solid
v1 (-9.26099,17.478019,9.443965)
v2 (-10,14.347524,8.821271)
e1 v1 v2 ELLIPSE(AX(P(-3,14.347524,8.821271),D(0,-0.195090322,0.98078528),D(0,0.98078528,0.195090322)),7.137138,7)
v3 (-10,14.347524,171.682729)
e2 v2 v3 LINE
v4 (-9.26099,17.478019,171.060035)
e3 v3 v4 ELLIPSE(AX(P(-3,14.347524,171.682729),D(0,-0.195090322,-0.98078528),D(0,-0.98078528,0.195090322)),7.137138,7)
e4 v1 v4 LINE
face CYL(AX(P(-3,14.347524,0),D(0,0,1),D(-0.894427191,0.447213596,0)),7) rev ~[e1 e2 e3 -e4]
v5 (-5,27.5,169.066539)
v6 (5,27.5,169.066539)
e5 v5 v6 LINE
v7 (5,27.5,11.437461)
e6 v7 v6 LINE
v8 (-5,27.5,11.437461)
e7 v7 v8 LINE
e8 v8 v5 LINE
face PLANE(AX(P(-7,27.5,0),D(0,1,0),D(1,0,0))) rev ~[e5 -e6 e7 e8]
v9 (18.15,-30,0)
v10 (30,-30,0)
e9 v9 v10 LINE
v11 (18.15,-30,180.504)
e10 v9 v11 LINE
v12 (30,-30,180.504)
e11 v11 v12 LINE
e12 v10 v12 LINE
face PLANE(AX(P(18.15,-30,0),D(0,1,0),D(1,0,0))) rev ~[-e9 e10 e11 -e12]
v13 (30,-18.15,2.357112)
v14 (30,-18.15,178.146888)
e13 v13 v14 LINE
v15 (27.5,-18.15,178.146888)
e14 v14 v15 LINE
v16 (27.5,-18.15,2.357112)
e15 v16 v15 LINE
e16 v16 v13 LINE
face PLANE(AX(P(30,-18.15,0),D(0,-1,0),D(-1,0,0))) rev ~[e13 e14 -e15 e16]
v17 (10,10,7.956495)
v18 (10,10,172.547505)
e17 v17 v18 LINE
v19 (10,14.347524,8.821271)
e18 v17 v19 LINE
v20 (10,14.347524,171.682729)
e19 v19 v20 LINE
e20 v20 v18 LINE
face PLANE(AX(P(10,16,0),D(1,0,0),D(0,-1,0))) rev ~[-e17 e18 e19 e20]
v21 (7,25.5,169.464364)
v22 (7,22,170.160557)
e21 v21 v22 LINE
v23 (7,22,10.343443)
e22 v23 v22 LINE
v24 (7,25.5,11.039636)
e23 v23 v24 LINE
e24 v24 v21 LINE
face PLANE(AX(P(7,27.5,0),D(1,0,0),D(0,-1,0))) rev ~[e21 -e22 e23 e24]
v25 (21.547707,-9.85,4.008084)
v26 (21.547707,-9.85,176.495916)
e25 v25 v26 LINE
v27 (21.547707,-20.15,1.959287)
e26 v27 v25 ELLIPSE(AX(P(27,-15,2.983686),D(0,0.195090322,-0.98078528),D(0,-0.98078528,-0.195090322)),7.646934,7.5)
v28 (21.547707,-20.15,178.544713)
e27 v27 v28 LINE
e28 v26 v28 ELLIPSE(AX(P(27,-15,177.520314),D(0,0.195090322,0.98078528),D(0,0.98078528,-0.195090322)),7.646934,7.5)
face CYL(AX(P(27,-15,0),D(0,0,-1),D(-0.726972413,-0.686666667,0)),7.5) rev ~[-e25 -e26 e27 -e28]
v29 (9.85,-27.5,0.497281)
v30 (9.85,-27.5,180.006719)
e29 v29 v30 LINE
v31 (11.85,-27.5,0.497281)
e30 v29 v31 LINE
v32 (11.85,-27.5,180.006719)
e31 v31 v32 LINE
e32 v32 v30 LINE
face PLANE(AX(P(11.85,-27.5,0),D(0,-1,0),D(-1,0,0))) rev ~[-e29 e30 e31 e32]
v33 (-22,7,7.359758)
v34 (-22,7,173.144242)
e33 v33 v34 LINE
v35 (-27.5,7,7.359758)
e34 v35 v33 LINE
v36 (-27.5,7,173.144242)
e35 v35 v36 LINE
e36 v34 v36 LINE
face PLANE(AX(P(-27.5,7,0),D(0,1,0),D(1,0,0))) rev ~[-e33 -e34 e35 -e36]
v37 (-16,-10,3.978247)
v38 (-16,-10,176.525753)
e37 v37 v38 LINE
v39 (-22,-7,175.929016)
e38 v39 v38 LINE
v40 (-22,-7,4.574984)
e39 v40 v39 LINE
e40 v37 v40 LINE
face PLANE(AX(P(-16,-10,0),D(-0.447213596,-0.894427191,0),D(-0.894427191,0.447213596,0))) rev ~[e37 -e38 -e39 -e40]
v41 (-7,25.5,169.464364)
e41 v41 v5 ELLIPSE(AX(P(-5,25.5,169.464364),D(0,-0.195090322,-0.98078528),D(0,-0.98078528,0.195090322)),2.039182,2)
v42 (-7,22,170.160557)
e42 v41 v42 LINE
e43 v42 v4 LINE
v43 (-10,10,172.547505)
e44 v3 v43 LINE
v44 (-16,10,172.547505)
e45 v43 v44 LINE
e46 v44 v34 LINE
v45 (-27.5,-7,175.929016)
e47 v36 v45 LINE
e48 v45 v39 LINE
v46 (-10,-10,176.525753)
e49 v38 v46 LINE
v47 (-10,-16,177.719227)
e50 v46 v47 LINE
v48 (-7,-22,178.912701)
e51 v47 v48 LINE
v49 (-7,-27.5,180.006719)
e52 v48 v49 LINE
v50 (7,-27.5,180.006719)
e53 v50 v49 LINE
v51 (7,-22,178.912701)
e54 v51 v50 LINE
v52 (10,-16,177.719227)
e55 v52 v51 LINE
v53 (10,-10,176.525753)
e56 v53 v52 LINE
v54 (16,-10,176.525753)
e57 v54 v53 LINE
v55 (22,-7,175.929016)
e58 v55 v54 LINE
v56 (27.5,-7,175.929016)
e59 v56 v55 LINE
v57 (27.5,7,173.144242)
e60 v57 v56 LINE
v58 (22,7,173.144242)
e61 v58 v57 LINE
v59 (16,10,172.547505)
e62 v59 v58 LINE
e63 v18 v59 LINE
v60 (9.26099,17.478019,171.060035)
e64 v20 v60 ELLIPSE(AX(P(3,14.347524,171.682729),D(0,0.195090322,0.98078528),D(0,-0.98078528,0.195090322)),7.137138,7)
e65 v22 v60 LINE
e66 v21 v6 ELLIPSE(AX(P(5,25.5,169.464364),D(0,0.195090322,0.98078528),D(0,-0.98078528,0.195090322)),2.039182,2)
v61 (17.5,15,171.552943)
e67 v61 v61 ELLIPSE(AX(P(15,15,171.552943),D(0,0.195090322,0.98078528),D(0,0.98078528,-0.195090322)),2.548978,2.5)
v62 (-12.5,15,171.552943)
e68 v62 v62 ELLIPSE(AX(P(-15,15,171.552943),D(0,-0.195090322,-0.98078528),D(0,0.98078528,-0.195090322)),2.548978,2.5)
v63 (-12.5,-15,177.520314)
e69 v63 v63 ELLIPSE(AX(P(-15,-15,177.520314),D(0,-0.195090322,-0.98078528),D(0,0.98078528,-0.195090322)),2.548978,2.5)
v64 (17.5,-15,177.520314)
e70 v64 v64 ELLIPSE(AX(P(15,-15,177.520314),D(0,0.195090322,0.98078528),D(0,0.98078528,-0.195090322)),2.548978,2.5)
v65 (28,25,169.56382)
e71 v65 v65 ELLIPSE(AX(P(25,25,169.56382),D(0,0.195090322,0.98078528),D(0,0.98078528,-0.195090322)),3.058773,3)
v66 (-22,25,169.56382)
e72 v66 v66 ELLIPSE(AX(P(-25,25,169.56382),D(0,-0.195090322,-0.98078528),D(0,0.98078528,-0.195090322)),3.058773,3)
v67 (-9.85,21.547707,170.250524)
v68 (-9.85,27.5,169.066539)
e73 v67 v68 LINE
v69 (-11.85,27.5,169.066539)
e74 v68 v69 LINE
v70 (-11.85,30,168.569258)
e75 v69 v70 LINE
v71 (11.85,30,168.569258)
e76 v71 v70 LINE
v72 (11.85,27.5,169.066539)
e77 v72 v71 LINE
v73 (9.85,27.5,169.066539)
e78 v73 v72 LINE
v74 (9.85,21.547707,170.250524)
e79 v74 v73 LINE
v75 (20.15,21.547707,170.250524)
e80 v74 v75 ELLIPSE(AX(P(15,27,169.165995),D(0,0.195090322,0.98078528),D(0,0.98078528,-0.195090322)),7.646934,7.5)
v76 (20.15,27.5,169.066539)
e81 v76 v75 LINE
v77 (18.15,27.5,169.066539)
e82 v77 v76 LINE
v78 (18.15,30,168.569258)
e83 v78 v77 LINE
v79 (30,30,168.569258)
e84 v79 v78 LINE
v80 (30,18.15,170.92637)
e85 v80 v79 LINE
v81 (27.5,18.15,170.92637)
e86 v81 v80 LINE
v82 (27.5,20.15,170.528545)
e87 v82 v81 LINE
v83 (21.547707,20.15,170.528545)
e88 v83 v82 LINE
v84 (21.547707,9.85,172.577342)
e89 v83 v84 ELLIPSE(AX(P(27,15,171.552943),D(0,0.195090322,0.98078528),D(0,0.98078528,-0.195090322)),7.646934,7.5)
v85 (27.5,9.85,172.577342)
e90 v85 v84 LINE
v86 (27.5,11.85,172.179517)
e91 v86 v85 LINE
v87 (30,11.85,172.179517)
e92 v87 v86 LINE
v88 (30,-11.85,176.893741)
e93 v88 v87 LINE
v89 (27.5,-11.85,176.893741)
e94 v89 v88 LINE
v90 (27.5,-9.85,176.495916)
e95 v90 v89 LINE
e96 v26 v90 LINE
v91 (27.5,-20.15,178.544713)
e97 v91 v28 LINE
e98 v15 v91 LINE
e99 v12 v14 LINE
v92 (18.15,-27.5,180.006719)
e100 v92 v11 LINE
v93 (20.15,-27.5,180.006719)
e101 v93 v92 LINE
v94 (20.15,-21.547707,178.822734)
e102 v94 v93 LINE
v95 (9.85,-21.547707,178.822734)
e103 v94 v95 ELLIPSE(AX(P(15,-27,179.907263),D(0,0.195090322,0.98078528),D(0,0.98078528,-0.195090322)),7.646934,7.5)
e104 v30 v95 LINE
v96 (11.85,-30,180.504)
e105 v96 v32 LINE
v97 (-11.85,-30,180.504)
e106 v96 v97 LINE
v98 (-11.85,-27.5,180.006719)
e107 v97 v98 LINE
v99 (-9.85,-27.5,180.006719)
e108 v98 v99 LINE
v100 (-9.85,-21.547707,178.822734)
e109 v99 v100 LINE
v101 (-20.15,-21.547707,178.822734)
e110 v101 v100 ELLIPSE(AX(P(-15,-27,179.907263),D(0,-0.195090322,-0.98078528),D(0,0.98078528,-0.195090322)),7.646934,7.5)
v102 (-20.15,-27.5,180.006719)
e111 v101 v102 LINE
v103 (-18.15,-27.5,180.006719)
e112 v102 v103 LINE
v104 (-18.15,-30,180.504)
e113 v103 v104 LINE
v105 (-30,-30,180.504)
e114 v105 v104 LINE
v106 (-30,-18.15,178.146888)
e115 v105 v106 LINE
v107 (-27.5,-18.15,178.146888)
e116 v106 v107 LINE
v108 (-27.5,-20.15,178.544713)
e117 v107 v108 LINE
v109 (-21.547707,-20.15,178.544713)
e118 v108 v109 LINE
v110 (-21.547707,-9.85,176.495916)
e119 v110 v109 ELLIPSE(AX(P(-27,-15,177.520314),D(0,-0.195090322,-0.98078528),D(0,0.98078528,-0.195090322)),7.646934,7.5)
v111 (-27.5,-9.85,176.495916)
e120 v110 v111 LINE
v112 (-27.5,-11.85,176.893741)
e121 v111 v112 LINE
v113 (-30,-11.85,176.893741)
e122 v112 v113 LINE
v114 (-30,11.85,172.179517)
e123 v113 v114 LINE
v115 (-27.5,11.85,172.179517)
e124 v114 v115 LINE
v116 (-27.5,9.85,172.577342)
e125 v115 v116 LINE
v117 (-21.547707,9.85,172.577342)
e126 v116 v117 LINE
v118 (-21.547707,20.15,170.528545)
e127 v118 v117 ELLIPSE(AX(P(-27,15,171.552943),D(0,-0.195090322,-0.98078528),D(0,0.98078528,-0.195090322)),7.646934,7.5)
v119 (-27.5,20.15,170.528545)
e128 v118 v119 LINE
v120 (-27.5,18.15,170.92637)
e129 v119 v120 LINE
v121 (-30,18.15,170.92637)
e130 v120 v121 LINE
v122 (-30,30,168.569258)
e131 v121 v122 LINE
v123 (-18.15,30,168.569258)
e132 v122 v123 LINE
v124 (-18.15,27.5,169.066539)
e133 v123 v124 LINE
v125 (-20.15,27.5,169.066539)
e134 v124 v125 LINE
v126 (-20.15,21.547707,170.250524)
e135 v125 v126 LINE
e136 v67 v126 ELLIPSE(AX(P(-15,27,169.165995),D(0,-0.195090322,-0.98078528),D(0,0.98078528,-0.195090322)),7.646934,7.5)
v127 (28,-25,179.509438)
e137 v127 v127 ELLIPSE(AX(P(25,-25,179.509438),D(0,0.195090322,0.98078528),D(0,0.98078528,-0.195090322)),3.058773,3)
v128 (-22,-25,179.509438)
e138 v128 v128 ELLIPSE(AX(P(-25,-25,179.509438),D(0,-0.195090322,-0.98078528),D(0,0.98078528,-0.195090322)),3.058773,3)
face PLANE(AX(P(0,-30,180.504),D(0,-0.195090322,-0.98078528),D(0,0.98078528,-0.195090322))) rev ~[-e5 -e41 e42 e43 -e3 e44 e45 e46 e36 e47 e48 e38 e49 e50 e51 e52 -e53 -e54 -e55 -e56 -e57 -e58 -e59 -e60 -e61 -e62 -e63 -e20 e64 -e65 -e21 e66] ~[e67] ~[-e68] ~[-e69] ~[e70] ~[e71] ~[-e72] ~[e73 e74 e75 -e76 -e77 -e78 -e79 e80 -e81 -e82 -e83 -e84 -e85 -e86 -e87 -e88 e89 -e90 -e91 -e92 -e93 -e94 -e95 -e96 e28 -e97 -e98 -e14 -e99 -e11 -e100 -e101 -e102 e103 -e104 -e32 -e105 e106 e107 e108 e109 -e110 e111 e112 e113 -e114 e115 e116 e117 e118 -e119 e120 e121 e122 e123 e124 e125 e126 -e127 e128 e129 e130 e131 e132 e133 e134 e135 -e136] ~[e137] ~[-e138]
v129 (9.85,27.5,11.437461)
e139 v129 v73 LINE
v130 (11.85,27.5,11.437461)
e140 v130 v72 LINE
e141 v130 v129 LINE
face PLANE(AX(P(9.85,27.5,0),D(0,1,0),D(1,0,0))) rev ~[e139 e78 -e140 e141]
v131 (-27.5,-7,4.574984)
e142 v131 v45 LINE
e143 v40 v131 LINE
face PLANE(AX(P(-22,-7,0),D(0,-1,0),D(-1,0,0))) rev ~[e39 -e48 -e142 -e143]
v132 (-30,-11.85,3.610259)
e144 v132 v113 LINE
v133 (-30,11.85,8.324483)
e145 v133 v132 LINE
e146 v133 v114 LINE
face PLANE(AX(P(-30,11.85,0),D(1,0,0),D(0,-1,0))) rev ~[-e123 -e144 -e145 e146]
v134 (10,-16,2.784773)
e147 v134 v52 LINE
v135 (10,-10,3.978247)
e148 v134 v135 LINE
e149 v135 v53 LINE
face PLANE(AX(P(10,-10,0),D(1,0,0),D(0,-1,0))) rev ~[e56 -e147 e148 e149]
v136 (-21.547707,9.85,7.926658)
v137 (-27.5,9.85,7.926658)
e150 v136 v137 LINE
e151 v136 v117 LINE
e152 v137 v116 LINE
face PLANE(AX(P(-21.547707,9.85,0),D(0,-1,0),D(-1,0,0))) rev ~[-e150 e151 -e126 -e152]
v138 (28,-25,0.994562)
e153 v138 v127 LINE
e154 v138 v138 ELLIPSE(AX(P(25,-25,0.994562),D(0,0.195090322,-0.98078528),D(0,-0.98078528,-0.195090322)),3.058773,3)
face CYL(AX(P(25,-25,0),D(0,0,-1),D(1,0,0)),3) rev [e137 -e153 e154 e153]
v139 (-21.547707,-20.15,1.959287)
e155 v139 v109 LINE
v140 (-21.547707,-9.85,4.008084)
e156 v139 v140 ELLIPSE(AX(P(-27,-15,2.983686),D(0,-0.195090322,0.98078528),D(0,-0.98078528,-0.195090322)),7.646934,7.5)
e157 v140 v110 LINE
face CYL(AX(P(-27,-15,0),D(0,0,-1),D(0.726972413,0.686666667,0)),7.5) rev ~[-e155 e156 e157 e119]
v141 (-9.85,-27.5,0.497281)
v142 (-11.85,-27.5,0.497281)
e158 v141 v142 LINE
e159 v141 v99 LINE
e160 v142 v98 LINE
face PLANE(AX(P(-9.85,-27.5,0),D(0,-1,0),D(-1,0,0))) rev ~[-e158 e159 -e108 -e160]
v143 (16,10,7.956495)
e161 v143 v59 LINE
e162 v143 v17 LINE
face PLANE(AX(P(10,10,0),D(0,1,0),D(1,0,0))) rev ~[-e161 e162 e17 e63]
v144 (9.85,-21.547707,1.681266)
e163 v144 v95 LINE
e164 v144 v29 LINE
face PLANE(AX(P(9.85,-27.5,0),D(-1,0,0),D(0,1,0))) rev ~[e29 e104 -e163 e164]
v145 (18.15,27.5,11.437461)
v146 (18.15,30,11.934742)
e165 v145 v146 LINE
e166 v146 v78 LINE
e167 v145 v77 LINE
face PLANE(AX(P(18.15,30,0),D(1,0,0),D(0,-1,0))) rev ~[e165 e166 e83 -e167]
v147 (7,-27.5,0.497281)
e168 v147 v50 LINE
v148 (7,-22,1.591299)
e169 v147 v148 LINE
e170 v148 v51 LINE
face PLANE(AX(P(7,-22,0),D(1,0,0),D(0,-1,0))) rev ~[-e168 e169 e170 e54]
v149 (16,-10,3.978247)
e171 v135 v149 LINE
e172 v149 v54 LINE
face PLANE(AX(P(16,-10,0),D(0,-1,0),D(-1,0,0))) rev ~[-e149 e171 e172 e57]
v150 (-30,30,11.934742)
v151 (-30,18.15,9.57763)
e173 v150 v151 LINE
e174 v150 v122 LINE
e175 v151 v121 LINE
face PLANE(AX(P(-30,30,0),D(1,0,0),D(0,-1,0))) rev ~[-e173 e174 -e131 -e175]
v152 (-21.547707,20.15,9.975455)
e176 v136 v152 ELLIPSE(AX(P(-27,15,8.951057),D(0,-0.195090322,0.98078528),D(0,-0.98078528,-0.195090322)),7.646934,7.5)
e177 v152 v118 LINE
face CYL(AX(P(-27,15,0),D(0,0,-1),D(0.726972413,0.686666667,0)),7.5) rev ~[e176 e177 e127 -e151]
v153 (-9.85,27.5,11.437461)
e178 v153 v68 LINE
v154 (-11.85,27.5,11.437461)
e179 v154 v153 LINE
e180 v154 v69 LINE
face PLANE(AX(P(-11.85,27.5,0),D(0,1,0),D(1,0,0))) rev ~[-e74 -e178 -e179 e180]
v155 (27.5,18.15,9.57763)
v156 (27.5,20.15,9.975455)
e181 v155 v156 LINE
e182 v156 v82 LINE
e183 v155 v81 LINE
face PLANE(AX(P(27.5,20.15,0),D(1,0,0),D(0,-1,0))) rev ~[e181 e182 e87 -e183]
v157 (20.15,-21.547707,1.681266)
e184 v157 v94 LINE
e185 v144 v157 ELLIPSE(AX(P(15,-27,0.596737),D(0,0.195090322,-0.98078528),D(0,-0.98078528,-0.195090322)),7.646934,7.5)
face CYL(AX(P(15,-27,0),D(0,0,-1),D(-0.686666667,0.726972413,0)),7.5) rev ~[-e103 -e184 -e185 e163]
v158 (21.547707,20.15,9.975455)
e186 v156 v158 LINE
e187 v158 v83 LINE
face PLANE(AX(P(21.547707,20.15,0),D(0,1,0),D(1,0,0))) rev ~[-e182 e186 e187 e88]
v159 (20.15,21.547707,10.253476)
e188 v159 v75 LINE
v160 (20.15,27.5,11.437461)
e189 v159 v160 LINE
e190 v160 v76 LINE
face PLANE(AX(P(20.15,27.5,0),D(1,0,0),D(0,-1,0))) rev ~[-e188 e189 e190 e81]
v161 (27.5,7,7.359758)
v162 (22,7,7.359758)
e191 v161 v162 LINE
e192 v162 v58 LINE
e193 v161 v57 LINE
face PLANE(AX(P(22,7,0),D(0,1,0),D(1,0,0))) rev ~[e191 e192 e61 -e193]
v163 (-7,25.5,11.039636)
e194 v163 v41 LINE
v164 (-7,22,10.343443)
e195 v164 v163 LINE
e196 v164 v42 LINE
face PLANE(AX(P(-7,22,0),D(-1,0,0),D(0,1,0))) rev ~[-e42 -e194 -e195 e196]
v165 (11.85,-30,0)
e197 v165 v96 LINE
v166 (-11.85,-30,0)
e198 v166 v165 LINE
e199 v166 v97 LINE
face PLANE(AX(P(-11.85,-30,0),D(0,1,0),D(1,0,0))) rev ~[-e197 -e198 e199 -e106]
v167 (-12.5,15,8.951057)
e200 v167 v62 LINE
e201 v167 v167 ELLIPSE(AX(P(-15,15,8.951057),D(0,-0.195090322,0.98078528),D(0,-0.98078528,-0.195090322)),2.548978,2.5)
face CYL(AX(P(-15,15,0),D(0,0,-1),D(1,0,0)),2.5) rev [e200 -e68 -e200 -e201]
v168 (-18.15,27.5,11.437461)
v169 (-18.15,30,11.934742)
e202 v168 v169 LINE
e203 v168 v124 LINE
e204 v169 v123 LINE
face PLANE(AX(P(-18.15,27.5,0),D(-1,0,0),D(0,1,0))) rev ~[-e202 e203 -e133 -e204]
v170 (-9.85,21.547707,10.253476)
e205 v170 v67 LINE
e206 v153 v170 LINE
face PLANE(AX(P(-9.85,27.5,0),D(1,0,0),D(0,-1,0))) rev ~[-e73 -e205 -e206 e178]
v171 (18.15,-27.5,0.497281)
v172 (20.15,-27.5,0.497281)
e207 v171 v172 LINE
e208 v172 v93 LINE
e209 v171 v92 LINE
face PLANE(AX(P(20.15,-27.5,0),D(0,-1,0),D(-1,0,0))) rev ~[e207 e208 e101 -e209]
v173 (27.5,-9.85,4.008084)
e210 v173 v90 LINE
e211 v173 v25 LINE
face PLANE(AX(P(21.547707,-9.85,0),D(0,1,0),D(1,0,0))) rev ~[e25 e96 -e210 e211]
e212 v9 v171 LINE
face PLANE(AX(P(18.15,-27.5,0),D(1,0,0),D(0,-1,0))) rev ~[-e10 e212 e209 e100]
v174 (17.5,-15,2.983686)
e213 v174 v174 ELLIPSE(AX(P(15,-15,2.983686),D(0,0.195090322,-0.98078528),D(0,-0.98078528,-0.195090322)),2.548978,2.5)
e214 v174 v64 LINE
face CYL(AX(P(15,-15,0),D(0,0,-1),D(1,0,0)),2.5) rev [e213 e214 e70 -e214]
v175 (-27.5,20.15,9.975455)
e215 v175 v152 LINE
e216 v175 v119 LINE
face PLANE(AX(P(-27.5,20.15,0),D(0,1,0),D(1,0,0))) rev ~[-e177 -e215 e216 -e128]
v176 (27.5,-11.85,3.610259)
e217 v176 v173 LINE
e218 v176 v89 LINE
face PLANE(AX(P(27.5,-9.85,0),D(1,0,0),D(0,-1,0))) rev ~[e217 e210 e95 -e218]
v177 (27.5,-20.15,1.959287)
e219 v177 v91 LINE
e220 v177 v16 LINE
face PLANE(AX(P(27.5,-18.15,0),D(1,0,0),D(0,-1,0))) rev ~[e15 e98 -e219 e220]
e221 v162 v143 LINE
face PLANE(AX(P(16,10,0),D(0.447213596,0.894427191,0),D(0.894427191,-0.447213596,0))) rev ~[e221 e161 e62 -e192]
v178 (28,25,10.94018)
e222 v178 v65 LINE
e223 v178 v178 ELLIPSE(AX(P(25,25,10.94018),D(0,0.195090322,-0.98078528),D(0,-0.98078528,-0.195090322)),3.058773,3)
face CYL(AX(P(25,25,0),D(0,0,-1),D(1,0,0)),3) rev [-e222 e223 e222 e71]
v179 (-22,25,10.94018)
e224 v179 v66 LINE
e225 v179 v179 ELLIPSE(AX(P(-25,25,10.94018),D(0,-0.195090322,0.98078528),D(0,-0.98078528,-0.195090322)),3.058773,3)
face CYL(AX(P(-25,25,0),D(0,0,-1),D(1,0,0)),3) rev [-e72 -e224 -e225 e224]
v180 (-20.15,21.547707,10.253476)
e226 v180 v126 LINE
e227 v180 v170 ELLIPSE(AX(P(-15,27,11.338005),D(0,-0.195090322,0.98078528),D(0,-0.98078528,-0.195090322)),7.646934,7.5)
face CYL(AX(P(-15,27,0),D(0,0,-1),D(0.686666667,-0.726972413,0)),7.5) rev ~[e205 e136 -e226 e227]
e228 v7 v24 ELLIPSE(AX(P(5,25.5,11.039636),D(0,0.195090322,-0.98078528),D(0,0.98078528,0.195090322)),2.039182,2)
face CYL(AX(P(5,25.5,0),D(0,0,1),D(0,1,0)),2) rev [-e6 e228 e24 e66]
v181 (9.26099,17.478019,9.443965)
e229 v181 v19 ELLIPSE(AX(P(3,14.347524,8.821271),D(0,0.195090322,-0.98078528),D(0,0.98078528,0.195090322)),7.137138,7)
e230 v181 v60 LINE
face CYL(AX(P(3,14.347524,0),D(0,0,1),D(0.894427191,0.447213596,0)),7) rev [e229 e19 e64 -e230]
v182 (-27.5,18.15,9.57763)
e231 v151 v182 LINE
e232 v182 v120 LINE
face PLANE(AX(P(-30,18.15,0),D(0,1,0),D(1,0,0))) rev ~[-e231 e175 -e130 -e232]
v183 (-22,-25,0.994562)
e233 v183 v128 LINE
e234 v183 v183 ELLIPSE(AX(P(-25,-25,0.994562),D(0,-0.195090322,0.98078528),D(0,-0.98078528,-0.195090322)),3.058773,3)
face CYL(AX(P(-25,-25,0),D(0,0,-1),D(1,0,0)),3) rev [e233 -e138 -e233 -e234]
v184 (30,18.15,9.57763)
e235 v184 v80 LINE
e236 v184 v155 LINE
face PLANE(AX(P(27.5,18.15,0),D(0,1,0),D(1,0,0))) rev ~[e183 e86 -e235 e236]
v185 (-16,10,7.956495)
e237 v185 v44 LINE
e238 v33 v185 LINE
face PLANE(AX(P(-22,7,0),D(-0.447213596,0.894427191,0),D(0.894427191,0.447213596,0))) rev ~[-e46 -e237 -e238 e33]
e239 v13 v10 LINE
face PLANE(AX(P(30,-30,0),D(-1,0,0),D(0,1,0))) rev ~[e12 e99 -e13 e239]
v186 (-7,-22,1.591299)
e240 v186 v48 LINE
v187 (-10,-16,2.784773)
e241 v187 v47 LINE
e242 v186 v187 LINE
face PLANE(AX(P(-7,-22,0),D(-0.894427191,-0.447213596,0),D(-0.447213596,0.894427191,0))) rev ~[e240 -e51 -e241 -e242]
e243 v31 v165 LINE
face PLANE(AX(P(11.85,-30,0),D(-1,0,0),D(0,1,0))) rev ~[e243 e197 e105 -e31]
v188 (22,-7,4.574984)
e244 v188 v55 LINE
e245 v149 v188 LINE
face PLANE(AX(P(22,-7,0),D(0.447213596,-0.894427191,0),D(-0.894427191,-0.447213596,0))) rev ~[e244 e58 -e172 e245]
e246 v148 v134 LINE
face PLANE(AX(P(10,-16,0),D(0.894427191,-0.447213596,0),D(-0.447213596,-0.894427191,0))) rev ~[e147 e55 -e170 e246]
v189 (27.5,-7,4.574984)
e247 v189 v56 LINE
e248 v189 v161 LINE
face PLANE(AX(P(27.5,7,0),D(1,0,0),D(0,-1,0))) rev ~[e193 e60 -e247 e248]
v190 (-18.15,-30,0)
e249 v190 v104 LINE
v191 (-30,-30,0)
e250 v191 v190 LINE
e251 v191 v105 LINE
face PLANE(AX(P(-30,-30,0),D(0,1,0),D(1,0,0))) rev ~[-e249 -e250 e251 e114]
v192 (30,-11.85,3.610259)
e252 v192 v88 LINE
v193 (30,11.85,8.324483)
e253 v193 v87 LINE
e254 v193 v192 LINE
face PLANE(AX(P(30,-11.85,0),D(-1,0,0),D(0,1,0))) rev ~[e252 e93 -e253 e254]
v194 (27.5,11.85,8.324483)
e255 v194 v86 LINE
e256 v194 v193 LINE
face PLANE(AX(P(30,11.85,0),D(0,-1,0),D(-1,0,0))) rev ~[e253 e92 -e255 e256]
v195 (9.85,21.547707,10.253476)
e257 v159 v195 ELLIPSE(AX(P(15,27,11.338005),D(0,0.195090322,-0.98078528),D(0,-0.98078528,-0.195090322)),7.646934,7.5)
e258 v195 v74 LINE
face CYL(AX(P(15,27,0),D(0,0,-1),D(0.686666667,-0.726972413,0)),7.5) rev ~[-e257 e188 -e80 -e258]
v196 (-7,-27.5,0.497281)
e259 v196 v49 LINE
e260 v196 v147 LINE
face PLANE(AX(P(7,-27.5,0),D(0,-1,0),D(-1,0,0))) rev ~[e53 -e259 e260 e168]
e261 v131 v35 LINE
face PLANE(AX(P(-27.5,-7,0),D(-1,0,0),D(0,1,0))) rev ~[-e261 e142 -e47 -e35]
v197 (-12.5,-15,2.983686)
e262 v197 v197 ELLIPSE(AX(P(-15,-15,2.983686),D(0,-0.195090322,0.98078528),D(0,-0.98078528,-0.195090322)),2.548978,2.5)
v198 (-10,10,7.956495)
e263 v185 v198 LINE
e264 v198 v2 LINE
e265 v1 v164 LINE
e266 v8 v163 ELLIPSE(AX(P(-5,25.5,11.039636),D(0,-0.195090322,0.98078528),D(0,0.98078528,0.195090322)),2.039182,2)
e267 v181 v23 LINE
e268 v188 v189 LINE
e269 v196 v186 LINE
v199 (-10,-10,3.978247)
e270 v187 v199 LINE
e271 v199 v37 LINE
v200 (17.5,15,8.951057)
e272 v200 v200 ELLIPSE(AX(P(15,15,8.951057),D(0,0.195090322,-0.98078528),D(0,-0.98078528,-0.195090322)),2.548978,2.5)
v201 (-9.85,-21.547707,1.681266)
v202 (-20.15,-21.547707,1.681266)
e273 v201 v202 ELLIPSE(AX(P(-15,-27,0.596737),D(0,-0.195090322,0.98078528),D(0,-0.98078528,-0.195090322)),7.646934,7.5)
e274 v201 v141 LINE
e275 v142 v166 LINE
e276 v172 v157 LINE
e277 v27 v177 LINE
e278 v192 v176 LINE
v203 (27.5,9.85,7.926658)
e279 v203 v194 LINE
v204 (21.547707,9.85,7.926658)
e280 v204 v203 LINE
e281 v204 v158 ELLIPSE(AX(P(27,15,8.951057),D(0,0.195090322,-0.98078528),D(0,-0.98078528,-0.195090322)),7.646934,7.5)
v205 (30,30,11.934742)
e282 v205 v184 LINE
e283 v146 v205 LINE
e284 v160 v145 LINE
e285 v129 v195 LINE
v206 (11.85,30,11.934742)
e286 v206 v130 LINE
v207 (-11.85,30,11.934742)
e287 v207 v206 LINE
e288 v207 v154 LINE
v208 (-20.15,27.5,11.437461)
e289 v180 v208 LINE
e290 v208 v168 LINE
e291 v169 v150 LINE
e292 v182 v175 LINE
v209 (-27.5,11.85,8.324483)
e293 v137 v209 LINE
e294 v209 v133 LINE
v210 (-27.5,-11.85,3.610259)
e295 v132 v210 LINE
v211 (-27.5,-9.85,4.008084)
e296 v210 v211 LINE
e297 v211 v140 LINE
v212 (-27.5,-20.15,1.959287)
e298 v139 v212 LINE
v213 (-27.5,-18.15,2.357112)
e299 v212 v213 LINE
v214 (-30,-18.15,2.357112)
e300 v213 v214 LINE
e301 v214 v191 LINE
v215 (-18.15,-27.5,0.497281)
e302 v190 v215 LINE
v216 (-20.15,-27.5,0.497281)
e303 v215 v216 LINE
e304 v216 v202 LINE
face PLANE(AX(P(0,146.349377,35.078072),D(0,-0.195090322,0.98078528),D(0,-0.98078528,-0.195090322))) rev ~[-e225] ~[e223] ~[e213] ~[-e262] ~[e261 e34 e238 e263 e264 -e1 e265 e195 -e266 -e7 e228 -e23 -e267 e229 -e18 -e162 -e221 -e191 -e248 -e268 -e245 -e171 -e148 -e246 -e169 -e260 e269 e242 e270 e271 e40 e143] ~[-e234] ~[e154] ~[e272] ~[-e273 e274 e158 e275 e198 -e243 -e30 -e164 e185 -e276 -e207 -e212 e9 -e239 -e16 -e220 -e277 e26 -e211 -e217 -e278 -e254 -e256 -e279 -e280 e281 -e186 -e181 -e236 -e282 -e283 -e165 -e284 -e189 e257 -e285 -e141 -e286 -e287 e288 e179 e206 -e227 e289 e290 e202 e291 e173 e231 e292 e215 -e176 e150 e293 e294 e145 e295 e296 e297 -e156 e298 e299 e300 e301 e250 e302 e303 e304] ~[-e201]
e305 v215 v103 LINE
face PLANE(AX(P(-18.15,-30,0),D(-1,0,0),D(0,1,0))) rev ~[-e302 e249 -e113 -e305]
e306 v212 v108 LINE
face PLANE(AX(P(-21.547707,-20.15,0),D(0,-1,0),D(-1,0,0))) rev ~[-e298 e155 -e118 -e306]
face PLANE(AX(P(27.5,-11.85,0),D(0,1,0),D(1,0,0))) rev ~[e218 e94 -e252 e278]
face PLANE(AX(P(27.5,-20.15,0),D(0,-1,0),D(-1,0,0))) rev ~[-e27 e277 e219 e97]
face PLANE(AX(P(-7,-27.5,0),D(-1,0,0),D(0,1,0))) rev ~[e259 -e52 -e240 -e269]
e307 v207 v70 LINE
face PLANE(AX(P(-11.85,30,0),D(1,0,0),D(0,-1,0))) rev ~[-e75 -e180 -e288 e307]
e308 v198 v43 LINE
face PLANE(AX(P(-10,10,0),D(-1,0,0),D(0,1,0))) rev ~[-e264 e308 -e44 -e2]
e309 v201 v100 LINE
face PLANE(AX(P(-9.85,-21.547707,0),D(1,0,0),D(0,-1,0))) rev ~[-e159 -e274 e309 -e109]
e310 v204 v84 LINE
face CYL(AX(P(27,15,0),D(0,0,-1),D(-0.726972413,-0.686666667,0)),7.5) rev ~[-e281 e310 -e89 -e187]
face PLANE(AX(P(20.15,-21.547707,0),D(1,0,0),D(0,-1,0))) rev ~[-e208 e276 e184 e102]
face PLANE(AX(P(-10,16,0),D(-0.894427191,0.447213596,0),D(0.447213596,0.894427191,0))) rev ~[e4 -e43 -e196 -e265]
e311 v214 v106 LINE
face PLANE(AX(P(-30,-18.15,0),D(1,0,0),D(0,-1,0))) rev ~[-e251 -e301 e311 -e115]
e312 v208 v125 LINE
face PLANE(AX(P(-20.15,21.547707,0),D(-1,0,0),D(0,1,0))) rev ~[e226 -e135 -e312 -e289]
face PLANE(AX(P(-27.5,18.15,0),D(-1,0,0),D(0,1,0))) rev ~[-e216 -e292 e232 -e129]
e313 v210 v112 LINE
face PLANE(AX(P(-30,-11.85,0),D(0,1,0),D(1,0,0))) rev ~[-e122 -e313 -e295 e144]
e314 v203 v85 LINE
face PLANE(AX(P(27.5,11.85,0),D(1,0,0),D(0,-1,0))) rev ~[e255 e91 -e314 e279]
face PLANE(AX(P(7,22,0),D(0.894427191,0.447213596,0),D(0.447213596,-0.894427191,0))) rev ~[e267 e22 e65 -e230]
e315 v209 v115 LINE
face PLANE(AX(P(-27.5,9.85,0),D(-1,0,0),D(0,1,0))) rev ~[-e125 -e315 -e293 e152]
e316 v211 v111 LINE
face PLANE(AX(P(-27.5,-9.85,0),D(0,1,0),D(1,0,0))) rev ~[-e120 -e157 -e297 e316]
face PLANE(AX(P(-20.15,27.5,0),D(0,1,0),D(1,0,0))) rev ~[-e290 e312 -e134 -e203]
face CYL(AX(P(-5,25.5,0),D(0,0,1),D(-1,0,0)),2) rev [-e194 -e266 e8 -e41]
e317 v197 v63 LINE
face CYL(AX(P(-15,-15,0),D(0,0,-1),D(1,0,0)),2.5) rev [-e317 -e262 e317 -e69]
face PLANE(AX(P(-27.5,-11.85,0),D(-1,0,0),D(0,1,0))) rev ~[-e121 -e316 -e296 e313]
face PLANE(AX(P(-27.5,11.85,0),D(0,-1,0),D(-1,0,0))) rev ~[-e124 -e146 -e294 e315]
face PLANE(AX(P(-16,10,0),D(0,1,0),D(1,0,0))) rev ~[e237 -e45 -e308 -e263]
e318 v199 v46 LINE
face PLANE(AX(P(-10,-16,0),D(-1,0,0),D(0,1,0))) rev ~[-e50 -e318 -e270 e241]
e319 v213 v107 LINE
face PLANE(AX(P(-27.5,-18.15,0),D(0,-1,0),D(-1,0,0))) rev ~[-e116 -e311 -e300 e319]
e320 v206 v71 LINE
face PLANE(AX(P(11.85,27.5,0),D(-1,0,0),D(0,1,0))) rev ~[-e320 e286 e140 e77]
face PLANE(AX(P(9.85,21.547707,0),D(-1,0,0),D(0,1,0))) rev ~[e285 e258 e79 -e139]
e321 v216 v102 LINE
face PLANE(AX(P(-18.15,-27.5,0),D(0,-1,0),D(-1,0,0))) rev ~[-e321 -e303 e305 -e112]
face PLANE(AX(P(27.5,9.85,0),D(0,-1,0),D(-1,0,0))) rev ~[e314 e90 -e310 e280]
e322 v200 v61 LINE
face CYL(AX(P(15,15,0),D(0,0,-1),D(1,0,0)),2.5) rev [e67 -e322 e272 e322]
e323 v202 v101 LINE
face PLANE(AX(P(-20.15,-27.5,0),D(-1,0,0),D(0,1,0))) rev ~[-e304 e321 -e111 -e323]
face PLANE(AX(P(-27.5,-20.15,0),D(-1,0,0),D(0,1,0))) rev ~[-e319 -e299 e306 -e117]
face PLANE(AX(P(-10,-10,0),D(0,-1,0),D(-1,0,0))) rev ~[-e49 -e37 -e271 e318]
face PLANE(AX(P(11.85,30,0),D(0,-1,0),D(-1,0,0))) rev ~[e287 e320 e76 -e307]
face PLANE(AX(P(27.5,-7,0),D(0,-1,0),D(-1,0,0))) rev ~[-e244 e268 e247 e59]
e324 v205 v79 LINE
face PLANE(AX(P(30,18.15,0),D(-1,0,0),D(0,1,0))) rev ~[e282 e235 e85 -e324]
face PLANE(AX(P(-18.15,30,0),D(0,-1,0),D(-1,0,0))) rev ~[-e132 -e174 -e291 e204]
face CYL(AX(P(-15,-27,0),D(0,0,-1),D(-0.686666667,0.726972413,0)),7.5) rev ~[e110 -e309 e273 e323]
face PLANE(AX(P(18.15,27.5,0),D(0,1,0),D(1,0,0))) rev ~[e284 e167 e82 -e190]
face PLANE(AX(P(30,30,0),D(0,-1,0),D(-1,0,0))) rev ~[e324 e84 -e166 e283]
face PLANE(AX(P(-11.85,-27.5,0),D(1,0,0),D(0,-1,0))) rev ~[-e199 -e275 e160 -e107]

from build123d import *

# Parameters (mm, degrees)
F0_R          = 3
F0_R_2        = 2.5
F1_DEPTH      = 180.504
F2_R          = 2
F3_R          = 7
F6_DEPTH      = 30
F6_DEPTH_BACK = 30


# Not quite as in the source:
# - a feature names something its author has since deleted; it is built from what else it names


with BuildPart() as f1:
    # F0 (on Top) → F1 (new body)
    with BuildSketch(Plane.XY):
        with BuildLine():
            Line((18.15, -30), (30, -30))
            Line((30, -30), (30, -18.15))
            Line((30, -18.15), (27.5, -18.15))
            Line((27.5, -18.15), (27.5, -20.15))
            Line((27.5, -20.15), (21.5477069044, -20.15))
            ThreePointArc((21.5477069044, -20.15), (19.5, -15), (21.5477069044, -9.85))
            Line((21.5477069044, -9.85), (27.5, -9.85))
            Line((27.5, -9.85), (27.5, -11.85))
            Line((27.5, -11.85), (30, -11.85))
            Line((30, -11.85), (30, 11.85))
            Line((30, 11.85), (27.5, 11.85))
            Line((27.5, 11.85), (27.5, 9.85))
            Line((27.5, 9.85), (21.5477069044, 9.85))
            ThreePointArc((21.5477069044, 9.85), (19.5, 15), (21.5477069044, 20.15))
            Line((21.5477069044, 20.15), (27.5, 20.15))
            Line((27.5, 20.15), (27.5, 18.15))
            Line((27.5, 18.15), (30, 18.15))
            Line((30, 18.15), (30, 30))
            Line((30, 30), (18.15, 30))
            Line((18.15, 30), (18.15, 27.5))
            Line((18.15, 27.5), (20.15, 27.5))
            Line((20.15, 27.5), (20.15, 21.5477069044))
            ThreePointArc((20.15, 21.5477069044), (15, 19.5), (9.85, 21.5477069044))
            Line((9.85, 21.5477069044), (9.85, 27.5))
            Line((9.85, 27.5), (11.85, 27.5))
            Line((11.85, 27.5), (11.85, 30))
            Line((11.85, 30), (-11.85, 30))
            Line((-11.85, 30), (-11.85, 27.5))
            Line((-11.85, 27.5), (-9.85, 27.5))
            Line((-9.85, 27.5), (-9.85, 21.5477069044))
            ThreePointArc((-9.85, 21.5477069044), (-15, 19.5), (-20.15, 21.5477069044))
            Line((-20.15, 21.5477069044), (-20.15, 27.5))
            Line((-20.15, 27.5), (-18.15, 27.5))
            Line((-18.15, 27.5), (-18.15, 30))
            Line((-18.15, 30), (-30, 30))
            Line((-30, 30), (-30, 18.15))
            Line((-30, 18.15), (-27.5, 18.15))
            Line((-27.5, 18.15), (-27.5, 20.15))
            Line((-27.5, 20.15), (-21.5477069044, 20.15))
            ThreePointArc((-21.5477069044, 20.15), (-19.5, 15), (-21.5477069044, 9.85))
            Line((-21.5477069044, 9.85), (-27.5, 9.85))
            Line((-27.5, 9.85), (-27.5, 11.85))
            Line((-27.5, 11.85), (-30, 11.85))
            Line((-30, 11.85), (-30, -11.85))
            Line((-30, -11.85), (-27.5, -11.85))
            Line((-27.5, -11.85), (-27.5, -9.85))
            Line((-27.5, -9.85), (-21.5477069044, -9.85))
            ThreePointArc((-21.5477069044, -9.85), (-19.5, -15), (-21.5477069044, -20.15))
            Line((-21.5477069044, -20.15), (-27.5, -20.15))
            Line((-27.5, -20.15), (-27.5, -18.15))
            Line((-27.5, -18.15), (-30, -18.15))
            Line((-30, -18.15), (-30, -30))
            Line((-30, -30), (-18.15, -30))
            Line((-18.15, -30), (-18.15, -27.5))
            Line((-18.15, -27.5), (-20.15, -27.5))
            Line((-20.15, -27.5), (-20.15, -21.5477069044))
            ThreePointArc((-20.15, -21.5477069044), (-15, -19.5), (-9.85, -21.5477069044))
            Line((-9.85, -21.5477069044), (-9.85, -27.5))
            Line((-9.85, -27.5), (-11.85, -27.5))
            Line((-11.85, -27.5), (-11.85, -30))
            Line((-11.85, -30), (11.85, -30))
            Line((11.85, -30), (11.85, -27.5))
            Line((11.85, -27.5), (9.85, -27.5))
            Line((9.85, -27.5), (9.85, -21.5477069044))
            ThreePointArc((9.85, -21.5477069044), (15, -19.5), (20.15, -21.5477069044))
            Line((20.15, -21.5477069044), (20.15, -27.5))
            Line((20.15, -27.5), (18.15, -27.5))
            Line((18.15, -27.5), (18.15, -30))
        make_face()
        with Locations((-25, -25)):
            Circle(F0_R, mode=Mode.SUBTRACT)
        with Locations((-15, -15)):
            Circle(F0_R_2, mode=Mode.SUBTRACT)
        with Locations((25, -25)):
            Circle(F0_R, mode=Mode.SUBTRACT)
        with Locations((15, -15)):
            Circle(F0_R_2, mode=Mode.SUBTRACT)
        with Locations((-25, 25)):
            Circle(F0_R, mode=Mode.SUBTRACT)
        with Locations((-15, 15)):
            Circle(F0_R_2, mode=Mode.SUBTRACT)
        Polygon((-7, 22), (-7, 27.5), (0, 27.5), (7, 27.5), (7, 22), (10, 16), (10, 10), (16, 10), (22, 7), (27.5, 7), (27.5, 0), (27.5, -7), (22, -7), (16, -10), (10, -10), (10, -16), (7, -22), (7, -27.5), (0, -27.5), (-7, -27.5), (-7, -22), (-10, -16), (-10, -10), (-16, -10), (-22, -7), (-27.5, -7), (-27.5, 0), (-27.5, 7), (-22, 7), (-16, 10), (-10, 10), (-10, 16), align=None, mode=Mode.SUBTRACT)
        with Locations((15, 15)):
            Circle(F0_R_2, mode=Mode.SUBTRACT)
        with Locations((25, 25)):
            Circle(F0_R, mode=Mode.SUBTRACT)
    extrude(amount=F1_DEPTH)

    # F2
    f2_edges = [f1.edges().sort_by_distance(p)[0] for p in [
        (-7, 27.5, 90.252),
        (7, 27.5, 90.252),
    ]]
    fillet(f2_edges, radius=F2_R)

    # F3
    f3_edges = [f1.edges().sort_by_distance(p)[0] for p in [
        (-10, 16, 90.252),
        (10, 16, 90.252),
    ]]
    fillet(f3_edges, radius=F3_R)

    # F5 (on Right) → F6 (cut, two sides)
    with BuildSketch(Plane.YZ) as f6_sk:
        Polygon((166.5976946582, -66.7170951811), (146.3493769552, 35.0780720561), (-30, 0), (-9.751682297, -101.7951672372), align=None)
        Polygon((135.5963626007, 147.5648354856), (151.7094622056, 228.5708574701), (-13.8869003951, 261.5100219845), (-30, 180.504), align=None)
    extrude(amount=F6_DEPTH, mode=Mode.SUBTRACT)
    extrude(f6_sk.sketch, amount=-F6_DEPTH_BACK, mode=Mode.SUBTRACT)


solid = f1.part
